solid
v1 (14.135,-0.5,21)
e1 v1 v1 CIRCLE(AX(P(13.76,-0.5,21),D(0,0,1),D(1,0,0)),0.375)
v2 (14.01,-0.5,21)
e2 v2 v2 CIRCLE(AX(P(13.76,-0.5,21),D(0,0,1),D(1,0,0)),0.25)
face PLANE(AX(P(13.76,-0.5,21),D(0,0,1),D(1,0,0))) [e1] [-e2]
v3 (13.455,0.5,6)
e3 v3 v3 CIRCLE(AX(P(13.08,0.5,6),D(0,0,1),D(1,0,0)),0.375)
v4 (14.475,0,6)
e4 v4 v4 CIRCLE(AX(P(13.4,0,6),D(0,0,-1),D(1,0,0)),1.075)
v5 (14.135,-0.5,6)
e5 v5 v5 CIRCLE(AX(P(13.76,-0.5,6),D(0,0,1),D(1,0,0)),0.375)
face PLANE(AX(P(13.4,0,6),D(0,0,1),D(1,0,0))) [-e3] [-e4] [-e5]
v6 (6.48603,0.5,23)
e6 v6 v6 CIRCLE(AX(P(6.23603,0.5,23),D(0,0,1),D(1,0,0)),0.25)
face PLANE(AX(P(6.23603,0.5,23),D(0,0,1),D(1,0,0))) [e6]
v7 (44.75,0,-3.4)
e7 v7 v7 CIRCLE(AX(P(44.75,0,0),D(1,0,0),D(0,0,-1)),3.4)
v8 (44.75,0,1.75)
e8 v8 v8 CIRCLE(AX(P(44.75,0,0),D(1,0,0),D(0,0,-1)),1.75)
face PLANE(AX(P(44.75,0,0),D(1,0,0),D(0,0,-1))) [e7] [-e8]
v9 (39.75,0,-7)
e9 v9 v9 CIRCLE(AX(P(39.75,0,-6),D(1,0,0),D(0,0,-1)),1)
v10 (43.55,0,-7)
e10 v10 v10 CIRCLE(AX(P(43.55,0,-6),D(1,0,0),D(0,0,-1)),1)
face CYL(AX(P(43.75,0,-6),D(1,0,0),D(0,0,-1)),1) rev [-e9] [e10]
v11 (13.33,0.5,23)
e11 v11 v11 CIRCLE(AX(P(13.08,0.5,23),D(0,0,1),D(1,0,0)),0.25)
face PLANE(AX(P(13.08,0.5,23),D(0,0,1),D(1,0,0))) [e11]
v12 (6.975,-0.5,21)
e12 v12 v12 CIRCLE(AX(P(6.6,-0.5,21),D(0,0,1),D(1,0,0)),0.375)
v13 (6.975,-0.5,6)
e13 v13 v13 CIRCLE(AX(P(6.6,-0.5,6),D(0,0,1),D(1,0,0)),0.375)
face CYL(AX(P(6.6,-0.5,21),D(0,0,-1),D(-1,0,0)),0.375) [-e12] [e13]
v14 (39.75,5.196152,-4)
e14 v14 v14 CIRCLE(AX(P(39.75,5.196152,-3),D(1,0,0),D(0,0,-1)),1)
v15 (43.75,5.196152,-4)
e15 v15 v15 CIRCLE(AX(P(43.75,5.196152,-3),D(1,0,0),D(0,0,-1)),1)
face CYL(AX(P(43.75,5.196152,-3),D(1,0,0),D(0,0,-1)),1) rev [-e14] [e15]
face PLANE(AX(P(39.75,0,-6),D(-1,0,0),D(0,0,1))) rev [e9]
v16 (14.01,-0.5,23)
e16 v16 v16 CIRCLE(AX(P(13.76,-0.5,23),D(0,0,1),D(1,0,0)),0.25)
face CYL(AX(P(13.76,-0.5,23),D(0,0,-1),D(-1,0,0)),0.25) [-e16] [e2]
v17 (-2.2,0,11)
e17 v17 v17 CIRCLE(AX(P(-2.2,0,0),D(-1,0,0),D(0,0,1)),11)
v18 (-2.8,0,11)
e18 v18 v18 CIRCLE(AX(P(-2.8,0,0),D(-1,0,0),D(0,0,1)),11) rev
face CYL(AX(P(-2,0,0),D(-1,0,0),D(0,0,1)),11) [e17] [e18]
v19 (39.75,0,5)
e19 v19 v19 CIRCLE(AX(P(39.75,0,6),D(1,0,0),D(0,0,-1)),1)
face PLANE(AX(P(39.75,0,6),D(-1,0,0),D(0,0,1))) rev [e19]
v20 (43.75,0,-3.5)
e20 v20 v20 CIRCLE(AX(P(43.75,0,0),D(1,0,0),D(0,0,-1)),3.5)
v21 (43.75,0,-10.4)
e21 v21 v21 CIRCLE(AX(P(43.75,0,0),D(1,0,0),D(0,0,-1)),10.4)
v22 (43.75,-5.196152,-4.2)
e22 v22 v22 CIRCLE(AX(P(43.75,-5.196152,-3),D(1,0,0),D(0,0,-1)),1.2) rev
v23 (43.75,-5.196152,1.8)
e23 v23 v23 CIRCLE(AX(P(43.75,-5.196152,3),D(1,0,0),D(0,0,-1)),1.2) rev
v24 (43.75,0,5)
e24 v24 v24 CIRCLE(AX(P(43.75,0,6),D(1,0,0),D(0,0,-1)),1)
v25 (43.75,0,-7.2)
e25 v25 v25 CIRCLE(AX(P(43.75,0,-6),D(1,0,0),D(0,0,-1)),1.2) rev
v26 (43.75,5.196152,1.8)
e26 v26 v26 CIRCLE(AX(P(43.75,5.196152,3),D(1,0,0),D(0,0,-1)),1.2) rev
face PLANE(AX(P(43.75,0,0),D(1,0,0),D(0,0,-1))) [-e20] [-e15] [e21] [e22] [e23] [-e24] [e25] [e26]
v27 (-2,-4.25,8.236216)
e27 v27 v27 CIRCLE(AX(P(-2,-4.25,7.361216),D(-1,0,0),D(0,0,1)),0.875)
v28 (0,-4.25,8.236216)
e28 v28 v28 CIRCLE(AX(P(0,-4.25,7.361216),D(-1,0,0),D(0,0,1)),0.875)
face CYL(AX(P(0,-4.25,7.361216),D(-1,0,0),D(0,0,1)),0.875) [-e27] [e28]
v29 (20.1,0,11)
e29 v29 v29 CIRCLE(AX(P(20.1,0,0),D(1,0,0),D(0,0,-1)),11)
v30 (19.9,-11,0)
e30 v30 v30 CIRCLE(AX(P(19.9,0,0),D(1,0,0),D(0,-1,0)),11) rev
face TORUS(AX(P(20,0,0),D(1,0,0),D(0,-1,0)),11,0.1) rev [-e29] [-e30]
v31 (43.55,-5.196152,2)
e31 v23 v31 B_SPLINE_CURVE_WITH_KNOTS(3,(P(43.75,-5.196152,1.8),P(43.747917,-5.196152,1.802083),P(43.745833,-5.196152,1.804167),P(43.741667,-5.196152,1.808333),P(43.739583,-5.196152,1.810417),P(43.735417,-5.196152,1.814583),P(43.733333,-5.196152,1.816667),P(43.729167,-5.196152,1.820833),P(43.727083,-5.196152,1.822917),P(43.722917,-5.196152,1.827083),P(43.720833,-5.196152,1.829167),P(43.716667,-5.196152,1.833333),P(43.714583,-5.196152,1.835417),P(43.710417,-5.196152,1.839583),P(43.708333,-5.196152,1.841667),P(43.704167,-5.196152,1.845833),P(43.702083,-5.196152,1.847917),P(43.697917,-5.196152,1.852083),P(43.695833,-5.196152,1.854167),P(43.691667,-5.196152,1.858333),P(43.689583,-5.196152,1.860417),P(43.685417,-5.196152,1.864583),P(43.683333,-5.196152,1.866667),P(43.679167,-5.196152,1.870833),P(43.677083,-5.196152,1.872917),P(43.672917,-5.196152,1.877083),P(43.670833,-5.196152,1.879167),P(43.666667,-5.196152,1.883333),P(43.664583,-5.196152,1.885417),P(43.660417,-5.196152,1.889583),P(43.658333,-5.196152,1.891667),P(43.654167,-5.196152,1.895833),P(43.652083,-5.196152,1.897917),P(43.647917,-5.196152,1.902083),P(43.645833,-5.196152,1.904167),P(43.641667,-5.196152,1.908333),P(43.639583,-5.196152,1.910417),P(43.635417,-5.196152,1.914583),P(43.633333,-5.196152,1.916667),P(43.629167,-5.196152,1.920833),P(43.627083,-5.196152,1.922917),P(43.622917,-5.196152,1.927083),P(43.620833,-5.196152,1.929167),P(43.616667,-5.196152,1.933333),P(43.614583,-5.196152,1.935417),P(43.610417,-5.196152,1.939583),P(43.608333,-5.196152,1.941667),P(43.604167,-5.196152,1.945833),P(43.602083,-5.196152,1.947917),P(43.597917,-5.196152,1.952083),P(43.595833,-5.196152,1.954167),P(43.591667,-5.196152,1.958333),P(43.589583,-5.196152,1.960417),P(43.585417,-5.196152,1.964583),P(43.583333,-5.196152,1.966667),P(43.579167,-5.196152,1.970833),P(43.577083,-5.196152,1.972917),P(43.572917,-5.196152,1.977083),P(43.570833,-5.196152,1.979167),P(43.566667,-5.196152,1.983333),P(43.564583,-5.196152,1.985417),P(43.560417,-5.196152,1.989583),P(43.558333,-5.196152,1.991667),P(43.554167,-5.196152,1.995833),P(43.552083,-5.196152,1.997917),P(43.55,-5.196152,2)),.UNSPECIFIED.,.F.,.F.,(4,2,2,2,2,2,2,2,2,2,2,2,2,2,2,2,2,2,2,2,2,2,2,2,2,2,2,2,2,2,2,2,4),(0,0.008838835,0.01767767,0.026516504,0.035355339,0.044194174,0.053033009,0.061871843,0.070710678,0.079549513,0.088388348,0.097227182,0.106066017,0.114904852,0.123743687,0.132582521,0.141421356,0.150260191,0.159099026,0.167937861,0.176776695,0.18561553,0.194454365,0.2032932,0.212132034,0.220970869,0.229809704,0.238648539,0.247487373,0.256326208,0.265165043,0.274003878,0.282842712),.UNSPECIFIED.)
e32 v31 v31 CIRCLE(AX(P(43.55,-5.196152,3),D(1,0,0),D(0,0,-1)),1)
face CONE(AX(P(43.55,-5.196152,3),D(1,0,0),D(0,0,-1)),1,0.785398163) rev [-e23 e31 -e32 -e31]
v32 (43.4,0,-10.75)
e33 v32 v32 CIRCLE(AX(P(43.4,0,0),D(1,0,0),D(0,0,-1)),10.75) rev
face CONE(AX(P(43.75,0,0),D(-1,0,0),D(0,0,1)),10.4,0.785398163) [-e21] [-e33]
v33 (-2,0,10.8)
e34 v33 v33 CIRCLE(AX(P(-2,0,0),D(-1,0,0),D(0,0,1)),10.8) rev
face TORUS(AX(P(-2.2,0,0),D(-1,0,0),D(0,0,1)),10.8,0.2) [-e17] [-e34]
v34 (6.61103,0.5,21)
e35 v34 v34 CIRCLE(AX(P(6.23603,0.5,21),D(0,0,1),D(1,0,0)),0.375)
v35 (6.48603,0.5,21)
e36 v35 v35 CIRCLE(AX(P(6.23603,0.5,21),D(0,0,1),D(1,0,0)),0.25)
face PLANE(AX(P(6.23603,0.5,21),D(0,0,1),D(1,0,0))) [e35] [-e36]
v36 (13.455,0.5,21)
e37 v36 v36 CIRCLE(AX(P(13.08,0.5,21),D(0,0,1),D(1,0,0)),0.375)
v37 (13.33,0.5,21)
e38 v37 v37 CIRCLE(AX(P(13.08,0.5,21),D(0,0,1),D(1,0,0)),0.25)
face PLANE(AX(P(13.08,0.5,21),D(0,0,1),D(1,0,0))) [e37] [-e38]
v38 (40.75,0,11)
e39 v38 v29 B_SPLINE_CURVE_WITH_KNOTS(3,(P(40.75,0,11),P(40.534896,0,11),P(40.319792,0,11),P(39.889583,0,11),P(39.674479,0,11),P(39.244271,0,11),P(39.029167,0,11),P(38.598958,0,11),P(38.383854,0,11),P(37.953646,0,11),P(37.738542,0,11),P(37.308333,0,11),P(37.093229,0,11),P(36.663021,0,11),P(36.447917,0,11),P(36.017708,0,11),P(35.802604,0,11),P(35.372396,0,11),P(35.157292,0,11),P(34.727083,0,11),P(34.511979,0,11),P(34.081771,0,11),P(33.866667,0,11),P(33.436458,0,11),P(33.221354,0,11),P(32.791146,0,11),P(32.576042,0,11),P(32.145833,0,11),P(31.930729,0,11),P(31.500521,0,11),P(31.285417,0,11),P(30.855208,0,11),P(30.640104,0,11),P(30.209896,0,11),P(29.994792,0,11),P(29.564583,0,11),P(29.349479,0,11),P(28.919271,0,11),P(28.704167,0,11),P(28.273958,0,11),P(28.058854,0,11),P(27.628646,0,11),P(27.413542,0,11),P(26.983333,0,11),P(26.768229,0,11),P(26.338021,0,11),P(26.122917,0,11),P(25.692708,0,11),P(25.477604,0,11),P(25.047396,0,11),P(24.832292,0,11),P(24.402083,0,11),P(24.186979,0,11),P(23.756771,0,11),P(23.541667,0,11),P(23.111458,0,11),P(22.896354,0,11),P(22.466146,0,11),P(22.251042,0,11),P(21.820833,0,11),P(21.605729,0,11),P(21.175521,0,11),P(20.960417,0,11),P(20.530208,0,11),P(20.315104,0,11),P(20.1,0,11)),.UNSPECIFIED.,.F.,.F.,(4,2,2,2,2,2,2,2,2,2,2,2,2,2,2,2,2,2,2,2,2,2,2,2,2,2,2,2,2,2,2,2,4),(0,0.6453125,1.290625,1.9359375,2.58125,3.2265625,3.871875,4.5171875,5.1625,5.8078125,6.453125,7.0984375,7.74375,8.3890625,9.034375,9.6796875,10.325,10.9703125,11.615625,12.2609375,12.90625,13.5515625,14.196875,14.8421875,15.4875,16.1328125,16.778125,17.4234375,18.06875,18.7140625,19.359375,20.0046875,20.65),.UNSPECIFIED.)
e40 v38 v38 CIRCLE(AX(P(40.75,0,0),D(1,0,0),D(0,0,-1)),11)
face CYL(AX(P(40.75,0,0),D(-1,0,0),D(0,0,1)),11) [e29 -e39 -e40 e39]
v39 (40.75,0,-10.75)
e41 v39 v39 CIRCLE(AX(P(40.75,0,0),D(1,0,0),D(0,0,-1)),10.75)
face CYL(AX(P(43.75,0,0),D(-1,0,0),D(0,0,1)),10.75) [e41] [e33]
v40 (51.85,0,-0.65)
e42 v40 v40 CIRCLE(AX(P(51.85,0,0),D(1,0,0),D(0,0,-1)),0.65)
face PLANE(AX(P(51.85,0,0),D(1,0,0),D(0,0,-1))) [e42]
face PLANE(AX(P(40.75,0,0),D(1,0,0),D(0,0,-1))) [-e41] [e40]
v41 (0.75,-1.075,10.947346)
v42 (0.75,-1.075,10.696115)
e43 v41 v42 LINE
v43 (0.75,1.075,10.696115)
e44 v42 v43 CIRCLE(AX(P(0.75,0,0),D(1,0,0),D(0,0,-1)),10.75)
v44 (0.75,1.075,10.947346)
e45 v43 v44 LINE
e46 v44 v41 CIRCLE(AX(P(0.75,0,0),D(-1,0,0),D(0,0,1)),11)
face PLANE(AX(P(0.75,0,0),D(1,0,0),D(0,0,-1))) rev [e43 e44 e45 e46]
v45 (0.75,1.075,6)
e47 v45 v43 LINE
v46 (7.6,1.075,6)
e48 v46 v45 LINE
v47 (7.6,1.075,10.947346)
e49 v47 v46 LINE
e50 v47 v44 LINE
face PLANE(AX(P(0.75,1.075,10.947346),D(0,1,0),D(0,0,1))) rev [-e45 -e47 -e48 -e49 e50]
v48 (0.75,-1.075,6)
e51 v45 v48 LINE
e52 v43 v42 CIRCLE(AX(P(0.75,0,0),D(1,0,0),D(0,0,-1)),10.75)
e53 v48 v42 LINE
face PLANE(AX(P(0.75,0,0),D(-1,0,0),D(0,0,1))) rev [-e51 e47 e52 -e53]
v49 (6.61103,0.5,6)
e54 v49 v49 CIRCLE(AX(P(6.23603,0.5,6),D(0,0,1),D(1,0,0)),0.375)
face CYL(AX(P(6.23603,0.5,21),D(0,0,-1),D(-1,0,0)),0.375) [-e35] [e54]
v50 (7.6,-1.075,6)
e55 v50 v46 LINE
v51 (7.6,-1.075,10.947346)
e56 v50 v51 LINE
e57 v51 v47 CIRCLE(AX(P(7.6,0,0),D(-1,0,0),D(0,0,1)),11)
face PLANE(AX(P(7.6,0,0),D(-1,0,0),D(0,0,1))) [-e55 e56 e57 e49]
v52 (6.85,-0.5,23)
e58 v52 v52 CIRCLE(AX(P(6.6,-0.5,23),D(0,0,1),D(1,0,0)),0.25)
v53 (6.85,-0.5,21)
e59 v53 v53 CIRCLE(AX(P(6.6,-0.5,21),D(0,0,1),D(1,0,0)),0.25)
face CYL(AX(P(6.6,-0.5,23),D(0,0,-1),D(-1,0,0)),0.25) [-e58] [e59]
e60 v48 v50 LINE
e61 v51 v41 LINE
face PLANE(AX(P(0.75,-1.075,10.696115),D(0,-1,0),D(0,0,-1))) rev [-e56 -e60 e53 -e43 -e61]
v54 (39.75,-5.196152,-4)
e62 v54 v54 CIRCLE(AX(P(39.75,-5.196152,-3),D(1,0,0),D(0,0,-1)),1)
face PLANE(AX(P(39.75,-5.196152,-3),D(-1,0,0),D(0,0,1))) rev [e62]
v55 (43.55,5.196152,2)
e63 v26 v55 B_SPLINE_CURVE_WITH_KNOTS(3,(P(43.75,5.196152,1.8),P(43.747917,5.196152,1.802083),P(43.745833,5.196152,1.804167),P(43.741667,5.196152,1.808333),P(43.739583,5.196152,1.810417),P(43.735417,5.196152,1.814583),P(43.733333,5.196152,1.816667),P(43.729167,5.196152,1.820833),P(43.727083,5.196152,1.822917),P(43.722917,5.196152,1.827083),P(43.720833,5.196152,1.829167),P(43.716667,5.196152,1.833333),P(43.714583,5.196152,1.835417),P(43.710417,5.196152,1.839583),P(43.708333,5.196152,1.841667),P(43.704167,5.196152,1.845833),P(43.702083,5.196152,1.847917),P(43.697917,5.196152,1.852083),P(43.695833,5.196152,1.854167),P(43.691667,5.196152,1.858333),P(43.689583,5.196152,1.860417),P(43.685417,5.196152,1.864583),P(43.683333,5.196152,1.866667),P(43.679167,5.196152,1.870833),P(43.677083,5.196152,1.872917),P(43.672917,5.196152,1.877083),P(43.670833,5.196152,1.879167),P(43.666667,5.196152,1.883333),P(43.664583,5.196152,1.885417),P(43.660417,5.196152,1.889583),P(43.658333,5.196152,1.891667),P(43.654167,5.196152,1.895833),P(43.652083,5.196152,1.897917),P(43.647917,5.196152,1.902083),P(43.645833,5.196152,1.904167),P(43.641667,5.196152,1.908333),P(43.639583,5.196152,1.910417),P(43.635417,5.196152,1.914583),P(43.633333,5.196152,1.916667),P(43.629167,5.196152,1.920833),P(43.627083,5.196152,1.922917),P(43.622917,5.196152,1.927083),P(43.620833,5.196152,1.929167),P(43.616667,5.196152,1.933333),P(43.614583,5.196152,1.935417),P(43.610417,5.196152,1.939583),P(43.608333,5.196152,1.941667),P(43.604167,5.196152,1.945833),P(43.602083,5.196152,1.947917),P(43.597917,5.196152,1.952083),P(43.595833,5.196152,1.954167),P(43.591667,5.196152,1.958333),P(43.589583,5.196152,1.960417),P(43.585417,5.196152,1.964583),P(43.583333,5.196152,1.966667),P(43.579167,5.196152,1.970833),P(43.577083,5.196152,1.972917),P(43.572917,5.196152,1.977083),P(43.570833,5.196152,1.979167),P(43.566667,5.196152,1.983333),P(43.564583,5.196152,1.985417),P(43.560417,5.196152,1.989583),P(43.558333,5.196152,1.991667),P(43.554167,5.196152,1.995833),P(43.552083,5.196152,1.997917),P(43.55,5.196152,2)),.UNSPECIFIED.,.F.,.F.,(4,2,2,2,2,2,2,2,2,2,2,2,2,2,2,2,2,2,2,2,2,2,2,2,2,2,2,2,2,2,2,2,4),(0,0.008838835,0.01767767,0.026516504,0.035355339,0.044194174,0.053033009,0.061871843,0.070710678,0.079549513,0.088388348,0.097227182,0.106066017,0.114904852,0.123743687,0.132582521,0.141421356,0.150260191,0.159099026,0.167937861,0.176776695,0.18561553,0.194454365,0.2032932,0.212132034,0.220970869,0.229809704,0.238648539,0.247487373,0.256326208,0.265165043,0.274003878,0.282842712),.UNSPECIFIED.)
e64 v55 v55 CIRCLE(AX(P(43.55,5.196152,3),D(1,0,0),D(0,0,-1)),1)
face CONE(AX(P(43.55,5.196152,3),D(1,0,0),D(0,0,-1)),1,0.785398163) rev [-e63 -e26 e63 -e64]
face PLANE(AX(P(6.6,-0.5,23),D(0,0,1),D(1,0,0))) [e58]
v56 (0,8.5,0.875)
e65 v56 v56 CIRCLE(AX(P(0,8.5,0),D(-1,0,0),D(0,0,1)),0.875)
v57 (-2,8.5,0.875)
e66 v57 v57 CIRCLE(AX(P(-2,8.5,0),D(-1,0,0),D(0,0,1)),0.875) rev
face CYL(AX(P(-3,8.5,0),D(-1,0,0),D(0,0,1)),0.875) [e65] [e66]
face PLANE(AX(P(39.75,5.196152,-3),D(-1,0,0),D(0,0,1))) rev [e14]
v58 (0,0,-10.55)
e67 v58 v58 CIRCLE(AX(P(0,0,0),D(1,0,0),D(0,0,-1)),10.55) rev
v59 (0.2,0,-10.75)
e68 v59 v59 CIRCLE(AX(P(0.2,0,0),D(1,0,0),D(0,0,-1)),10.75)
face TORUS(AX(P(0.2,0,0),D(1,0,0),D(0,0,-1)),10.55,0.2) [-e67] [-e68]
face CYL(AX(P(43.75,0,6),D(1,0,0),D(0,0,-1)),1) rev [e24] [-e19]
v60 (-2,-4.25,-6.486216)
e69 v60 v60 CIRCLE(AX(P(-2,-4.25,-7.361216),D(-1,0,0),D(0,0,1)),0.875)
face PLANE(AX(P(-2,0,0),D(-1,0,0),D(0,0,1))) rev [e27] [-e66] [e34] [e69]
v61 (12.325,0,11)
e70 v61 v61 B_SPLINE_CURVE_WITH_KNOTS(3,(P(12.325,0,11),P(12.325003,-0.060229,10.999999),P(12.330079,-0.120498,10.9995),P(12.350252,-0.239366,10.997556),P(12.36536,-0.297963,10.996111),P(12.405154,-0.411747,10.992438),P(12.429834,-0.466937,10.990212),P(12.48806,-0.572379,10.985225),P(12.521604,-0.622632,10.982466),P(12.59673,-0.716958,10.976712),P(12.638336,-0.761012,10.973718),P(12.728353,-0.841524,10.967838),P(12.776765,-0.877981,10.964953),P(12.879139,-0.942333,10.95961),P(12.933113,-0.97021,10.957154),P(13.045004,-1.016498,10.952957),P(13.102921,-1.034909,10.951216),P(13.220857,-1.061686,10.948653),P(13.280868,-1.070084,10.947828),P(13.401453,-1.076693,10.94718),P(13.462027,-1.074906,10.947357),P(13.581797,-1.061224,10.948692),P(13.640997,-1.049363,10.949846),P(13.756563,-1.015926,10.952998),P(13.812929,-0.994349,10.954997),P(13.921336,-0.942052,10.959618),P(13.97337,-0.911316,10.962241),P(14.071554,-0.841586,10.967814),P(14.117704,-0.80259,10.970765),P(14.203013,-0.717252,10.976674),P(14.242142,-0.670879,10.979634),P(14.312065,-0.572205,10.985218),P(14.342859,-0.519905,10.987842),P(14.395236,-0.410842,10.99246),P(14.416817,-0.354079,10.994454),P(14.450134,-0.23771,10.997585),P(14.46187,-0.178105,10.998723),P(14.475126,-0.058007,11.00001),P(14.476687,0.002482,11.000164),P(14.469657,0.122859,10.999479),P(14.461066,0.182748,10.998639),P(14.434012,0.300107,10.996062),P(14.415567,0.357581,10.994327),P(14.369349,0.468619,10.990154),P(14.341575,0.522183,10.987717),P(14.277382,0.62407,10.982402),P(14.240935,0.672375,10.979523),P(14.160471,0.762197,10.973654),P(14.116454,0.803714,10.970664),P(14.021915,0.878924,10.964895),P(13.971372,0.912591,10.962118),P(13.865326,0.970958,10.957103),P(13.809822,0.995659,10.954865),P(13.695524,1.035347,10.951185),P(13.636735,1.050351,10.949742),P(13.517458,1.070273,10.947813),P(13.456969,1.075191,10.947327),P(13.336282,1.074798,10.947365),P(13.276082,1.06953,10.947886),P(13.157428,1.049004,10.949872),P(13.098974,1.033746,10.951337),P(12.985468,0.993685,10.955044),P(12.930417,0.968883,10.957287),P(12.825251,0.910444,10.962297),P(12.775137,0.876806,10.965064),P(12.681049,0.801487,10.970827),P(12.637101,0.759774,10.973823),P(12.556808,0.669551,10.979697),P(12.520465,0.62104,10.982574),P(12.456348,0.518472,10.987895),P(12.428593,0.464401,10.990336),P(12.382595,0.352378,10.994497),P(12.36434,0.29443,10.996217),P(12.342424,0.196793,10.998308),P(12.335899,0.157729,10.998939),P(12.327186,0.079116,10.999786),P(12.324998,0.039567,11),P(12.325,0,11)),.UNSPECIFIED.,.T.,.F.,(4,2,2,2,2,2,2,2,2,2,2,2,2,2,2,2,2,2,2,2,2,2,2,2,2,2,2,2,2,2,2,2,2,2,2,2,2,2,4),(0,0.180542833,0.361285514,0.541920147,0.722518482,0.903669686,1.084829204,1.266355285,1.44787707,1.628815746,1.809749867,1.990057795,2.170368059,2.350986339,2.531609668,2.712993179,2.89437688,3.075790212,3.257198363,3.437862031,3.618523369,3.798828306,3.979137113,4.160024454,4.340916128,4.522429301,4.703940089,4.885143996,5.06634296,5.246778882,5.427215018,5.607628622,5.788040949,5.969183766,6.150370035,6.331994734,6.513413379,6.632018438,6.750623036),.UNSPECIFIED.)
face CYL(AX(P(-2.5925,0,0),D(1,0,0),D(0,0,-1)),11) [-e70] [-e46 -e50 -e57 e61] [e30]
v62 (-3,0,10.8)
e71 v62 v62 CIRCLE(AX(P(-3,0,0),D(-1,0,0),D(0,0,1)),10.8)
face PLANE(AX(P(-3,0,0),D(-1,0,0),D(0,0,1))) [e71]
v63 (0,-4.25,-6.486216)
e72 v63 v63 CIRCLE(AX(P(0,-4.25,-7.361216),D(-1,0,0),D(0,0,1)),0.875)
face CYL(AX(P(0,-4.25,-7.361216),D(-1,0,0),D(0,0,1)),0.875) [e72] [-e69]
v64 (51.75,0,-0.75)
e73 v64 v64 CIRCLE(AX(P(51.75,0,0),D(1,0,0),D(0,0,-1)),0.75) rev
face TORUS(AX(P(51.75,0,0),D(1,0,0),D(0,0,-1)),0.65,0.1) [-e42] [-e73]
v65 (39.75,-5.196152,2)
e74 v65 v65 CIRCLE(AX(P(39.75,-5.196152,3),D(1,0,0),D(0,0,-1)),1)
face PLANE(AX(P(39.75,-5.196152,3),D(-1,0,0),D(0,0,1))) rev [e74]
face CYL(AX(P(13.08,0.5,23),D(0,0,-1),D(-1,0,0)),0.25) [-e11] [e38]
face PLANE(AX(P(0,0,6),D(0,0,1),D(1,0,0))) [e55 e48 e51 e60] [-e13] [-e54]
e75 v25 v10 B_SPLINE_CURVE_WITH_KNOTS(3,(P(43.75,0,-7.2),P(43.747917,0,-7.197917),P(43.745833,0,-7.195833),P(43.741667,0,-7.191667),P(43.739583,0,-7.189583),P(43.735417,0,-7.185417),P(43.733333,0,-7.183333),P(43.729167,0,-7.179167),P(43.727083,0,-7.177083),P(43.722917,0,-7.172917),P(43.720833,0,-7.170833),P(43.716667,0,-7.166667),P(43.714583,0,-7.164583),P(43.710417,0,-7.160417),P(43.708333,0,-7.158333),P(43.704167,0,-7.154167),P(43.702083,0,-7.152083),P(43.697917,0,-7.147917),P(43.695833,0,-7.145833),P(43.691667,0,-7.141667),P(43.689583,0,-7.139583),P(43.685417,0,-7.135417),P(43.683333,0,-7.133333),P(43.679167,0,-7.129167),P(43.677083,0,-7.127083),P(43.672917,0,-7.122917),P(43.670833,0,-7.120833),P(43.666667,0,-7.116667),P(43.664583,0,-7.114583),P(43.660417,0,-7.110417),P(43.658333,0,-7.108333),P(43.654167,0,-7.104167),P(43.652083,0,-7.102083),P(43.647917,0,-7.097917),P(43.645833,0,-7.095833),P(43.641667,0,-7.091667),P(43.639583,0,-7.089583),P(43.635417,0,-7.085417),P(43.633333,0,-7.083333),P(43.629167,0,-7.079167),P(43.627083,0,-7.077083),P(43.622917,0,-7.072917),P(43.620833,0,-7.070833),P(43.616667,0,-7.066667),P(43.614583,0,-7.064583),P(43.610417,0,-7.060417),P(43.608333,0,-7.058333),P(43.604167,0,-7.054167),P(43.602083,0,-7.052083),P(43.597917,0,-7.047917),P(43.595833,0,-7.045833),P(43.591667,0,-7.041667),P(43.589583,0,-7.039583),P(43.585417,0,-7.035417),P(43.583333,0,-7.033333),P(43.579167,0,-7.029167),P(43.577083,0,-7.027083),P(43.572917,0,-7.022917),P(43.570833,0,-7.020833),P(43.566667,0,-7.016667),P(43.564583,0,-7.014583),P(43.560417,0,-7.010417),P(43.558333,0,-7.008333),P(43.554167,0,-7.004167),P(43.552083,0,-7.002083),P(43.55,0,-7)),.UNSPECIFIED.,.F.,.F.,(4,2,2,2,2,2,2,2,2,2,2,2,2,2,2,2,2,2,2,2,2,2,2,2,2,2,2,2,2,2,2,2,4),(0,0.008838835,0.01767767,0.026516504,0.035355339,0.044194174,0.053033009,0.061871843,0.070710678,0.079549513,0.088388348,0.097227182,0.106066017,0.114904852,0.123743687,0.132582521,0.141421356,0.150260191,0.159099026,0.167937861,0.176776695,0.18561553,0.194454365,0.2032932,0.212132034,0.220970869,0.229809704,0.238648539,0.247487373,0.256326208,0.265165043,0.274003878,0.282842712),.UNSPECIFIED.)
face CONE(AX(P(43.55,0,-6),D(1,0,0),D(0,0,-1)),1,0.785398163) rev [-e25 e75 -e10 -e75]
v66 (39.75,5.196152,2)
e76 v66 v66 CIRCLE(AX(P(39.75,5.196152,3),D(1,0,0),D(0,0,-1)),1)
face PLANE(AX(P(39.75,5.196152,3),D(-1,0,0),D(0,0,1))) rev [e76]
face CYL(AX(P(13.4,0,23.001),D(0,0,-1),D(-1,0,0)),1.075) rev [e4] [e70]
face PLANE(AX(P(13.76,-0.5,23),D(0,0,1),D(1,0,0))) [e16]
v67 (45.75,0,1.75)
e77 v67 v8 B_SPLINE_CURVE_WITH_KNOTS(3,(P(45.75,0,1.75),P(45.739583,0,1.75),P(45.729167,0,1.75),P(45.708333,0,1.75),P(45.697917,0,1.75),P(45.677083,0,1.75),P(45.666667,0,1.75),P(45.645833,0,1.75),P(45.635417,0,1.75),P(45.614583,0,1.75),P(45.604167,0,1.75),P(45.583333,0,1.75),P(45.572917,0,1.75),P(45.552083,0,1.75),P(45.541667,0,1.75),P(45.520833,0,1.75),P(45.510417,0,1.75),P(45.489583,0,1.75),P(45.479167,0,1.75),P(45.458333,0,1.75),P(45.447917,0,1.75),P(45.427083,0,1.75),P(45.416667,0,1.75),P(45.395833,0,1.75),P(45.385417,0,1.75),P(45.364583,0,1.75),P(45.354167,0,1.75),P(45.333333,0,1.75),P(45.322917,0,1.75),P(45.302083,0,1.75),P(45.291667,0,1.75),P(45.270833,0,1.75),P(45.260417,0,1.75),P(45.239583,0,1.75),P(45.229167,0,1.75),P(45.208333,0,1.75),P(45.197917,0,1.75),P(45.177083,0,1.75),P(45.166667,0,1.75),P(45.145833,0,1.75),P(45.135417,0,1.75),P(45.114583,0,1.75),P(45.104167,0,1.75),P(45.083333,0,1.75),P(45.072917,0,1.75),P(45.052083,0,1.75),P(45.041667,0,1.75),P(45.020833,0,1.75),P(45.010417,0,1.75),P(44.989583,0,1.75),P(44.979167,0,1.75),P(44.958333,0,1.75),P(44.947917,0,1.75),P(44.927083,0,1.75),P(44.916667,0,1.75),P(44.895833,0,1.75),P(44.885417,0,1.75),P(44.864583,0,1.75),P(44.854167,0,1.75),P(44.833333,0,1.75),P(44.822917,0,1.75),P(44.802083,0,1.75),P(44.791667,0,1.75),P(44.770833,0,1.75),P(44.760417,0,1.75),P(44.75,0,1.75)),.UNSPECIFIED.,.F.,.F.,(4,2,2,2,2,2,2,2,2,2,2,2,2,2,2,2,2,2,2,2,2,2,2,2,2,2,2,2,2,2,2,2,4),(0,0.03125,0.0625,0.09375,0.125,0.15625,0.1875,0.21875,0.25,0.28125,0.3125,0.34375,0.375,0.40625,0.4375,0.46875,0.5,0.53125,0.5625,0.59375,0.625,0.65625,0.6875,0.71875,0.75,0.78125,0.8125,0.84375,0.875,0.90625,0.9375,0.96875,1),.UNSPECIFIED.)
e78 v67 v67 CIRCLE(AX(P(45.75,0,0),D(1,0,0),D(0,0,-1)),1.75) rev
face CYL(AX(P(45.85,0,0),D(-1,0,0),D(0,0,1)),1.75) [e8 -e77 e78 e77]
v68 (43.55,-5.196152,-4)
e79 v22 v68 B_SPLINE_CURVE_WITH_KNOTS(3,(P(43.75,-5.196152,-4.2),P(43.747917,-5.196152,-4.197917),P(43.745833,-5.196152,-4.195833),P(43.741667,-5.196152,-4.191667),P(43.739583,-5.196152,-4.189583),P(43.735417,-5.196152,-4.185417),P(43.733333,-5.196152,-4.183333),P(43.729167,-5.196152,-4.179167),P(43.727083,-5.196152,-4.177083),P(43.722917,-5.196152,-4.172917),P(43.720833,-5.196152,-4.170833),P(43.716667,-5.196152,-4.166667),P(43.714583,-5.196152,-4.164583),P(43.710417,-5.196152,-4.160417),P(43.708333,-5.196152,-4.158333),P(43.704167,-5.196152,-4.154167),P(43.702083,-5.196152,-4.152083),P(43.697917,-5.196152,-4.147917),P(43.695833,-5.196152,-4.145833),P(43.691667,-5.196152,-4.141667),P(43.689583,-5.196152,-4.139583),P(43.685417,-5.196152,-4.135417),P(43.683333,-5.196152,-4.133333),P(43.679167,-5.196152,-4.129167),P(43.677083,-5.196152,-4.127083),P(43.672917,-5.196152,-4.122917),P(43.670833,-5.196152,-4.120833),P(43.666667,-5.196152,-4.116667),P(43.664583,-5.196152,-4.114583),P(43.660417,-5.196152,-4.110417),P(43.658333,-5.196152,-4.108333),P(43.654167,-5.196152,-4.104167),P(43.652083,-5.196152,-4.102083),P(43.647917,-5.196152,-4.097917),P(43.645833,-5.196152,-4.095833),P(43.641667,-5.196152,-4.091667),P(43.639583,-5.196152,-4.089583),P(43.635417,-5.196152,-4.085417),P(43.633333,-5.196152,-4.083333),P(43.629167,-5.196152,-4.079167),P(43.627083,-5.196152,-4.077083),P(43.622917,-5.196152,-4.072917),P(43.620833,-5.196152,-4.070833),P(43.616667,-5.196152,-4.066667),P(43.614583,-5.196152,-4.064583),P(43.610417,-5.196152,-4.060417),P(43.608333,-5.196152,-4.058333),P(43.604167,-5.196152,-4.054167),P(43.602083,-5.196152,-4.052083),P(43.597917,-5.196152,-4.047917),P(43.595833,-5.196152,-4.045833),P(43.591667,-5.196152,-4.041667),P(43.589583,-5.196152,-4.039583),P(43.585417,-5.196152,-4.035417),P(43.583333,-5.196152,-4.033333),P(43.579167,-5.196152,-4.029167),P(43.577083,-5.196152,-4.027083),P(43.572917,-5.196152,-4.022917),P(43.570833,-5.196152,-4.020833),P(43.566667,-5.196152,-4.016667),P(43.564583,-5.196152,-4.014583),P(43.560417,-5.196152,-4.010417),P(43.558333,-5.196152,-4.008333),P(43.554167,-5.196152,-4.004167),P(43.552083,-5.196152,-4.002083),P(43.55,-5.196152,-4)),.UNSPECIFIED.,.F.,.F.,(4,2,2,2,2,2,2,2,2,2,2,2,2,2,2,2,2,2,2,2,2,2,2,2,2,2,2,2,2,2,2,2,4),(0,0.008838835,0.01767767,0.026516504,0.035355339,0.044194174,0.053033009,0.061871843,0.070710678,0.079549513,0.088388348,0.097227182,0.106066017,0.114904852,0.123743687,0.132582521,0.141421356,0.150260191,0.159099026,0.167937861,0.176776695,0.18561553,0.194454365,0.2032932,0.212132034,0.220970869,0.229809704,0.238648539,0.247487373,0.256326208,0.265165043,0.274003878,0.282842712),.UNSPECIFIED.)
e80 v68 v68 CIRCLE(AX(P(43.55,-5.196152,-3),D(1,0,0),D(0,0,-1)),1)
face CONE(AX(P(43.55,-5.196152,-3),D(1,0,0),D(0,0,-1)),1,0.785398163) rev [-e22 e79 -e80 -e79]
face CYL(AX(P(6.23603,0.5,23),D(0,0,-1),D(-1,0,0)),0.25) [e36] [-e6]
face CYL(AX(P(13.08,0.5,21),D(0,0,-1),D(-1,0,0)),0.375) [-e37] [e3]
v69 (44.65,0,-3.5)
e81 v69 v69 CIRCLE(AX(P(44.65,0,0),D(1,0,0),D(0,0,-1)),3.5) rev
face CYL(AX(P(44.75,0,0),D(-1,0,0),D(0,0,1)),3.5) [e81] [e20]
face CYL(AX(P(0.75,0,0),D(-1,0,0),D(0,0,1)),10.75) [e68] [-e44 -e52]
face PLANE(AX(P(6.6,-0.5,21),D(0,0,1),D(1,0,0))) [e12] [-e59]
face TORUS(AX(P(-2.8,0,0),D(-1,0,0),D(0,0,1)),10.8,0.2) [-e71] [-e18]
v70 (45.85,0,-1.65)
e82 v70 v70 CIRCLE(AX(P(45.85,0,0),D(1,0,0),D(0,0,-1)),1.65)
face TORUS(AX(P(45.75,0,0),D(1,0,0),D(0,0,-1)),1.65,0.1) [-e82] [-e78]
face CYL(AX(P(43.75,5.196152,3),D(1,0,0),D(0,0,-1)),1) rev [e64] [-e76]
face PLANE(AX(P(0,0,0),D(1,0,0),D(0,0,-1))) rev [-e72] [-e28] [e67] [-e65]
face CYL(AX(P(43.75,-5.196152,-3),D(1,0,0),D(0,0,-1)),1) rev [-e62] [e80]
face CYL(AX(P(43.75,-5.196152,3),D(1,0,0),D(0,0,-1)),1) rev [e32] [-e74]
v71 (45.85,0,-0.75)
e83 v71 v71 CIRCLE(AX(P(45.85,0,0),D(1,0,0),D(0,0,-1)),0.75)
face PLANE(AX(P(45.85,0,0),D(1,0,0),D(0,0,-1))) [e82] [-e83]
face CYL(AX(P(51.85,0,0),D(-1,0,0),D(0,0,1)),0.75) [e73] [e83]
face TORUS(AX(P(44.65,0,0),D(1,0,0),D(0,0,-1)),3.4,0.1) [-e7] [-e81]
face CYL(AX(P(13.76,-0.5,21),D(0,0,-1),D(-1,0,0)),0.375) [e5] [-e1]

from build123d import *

# Parameters (mm, degrees)
CUT_EXTRUDE1_OUTLINE_W       = 11
CUT_EXTRUDE1_OUTLINE_H       = 1
CUT_EXTRUDE1_2_DEPTH         = 0.75
CUT_EXTRUDE1_START           = -2
CUT_EXTRUDE1_3_OUTLINE_R     = 0.875
CUT_EXTRUDE1_3_DEPTH         = 2
CUT_EXTRUDE2_START           = -6.85
CUT_EXTRUDE2_DEPTH           = 6.85
CUT_EXTRUDE3_START           = -0.75
CUT_EXTRUDE3_DEPTH           = 0.75
SKETCH4_W                    = 6.85
SKETCH4_H                    = 2.15
CUT_EXTRUDE4_DEPTH           = 4.696114949
BOSS_EXTRUDE1_START          = 20.65
SKETCH5_R                    = 11
BOSS_EXTRUDE1_DEPTH          = 20.65
SKETCH6_R                    = 10.75
BOSS_EXTRUDE2_DEPTH          = 3
SKETCH7_R                    = 3.5
BOSS_EXTRUDE3_DEPTH          = 1
SKETCH8_R                    = 1.75
BOSS_EXTRUDE4_DEPTH          = 1.1
SKETCH9_R                    = 0.75
BOSS_EXTRUDE5_DEPTH          = 6
SKETCH10_R                   = 0.375
BOSS_EXTRUDE6_DEPTH          = 15
SKETCH11_R                   = 0.25
BOSS_EXTRUDE7_DEPTH          = 2
SKETCH12_R                   = 0.375
BOSS_EXTRUDE8_DEPTH          = 15
SKETCH13_R                   = 0.25
BOSS_EXTRUDE9_DEPTH          = 2
CUT_EXTRUDE5_REACH           = 57.663
CUT_EXTRUDE5_END_RADIUS      = 11
SKETCH14_R                   = 1.075
SKETCH15_R                   = 0.375
BOSS_EXTRUDE10_DEPTH         = 15
SKETCH16_R                   = 0.25
BOSS_EXTRUDE11_DEPTH         = 2
SKETCH17_R                   = 0.375
BOSS_EXTRUDE12_DEPTH         = 15
SKETCH18_R                   = 0.25
BOSS_EXTRUDE13_DEPTH         = 2
SKETCH19_W                   = 2
SKETCH19_H                   = 0.875
SKETCH20_W                   = 2
SKETCH20_H                   = 0.875
F_2_0_2_DIAMETER_HOLE1_D     = 2
F_2_0_2_DIAMETER_HOLE1_DEPTH = 4
FILLET1_R                    = 0.1
CHAMFER1_SIZE                = 0.2
CHAMFER2_SIZE                = 0.35
FILLET2_R                    = 0.2


with BuildPart() as part:
    # Cut-Extrude1: read off the stored shape, not the designer's step
    # Cut-Extrude1 outline → Cut-Extrude1 (revolve)
    with BuildSketch(Plane.YX):
        with Locations((5.5, -2.5)):
            Rectangle(CUT_EXTRUDE1_OUTLINE_W, CUT_EXTRUDE1_OUTLINE_H)
        with BuildLine():
            Line((11, 0), (11, 19.9))
            ThreePointArc((11, 19.9), (10.9, 20), (11, 20.1))
            Line((11, 20.1), (0, 20.1))
            Line((0, 20.1), (0, 0))
            Line((0, 0), (11, 0))
        make_face()
    revolve(axis=Axis((0, 0, 0), (1, 0, 0)))

    # Cut-Extrude1 2 outline → Cut-Extrude1 2 (cut)
    with BuildSketch(Plane.YZ):
        with BuildLine():
            Line((-1.075, 10.947345569), (-1.075, 10.696114949))
            ThreePointArc((-1.075, 10.696114949), (0, 10.75), (1.075, 10.696114949))
            Line((1.075, 10.696114949), (1.075, 10.947345569))
            ThreePointArc((1.075, 10.947345569), (0, 11), (-1.075, 10.947345569))
        make_face()
    extrude(amount=CUT_EXTRUDE1_2_DEPTH, mode=Mode.SUBTRACT)

    # Cut-Extrude1 3 outline → Cut-Extrude1 3 (add)
    with BuildSketch(Plane.YZ.offset(CUT_EXTRUDE1_START)):
        with Locations((8.5, 0)):
            Circle(CUT_EXTRUDE1_3_OUTLINE_R)
    extrude(amount=CUT_EXTRUDE1_3_DEPTH)

    # Sketch2 → Cut-Extrude2 (cut)
    with BuildSketch(Plane.ZY.offset(-0.75).offset(CUT_EXTRUDE2_START)):
        with BuildLine():
            Line((10.947345569, 1.075), (10.696114949, 1.075))
            Line((10.696114949, 1.075), (10.696114949, -1.075))
            Line((10.696114949, -1.075), (10.947345569, -1.075))
            ThreePointArc((10.947345569, -1.075), (11, 0), (10.947345569, 1.075))
        make_face()
    extrude(amount=CUT_EXTRUDE2_DEPTH, mode=Mode.SUBTRACT)

    # Sketch3 → Cut-Extrude3 (cut)
    with BuildSketch(Plane.ZY.offset(CUT_EXTRUDE3_START)):
        with BuildLine():
            Line((10.696114949, 1.075), (10.947345569, 1.075))
            ThreePointArc((10.947345569, 1.075), (-11, 0), (10.947345569, -1.075))
            Line((10.947345569, -1.075), (10.696114949, -1.075))
            ThreePointArc((10.696114949, -1.075), (-10.75, 0), (10.696114949, 1.075))
        make_face()
    extrude(amount=CUT_EXTRUDE3_DEPTH, mode=Mode.SUBTRACT)

    # Sketch4 → Cut-Extrude4 (cut)
    with BuildSketch(Plane.XY.offset(10.696114949)):
        with Locations((4.175, 0)):
            Rectangle(SKETCH4_W, SKETCH4_H)
    extrude(amount=-CUT_EXTRUDE4_DEPTH, mode=Mode.SUBTRACT)

    # Sketch5 → Boss-Extrude1 (add)
    with BuildSketch(Plane(origin=(20.1, 0, 0), x_dir=(0, 0, -1), z_dir=(1, 0, 0)).offset(BOSS_EXTRUDE1_START)):
        with Locations(Location((0, 0, 0), (0, 0, 180))):
            Circle(SKETCH5_R)
    extrude(amount=-BOSS_EXTRUDE1_DEPTH)

    # Sketch6 → Boss-Extrude2 (add)
    with BuildSketch(Plane(origin=(40.75, 0, 0), x_dir=(0, 0, -1), z_dir=(1, 0, 0))):
        with Locations(Location((0, 0, 0), (0, 0, 174.260829523))):
            Circle(SKETCH6_R)
    extrude(amount=BOSS_EXTRUDE2_DEPTH)

    # Sketch7 → Boss-Extrude3 (add)
    with BuildSketch(Plane(origin=(43.75, 0, 0), x_dir=(0, 0, -1), z_dir=(1, 0, 0))):
        Circle(SKETCH7_R)
    extrude(amount=BOSS_EXTRUDE3_DEPTH)

    # Sketch8 → Boss-Extrude4 (add)
    with BuildSketch(Plane(origin=(44.75, 0, 0), x_dir=(0, 0, -1), z_dir=(1, 0, 0))):
        with Locations(Location((0, 0, 0), (0, 0, 180))):
            Circle(SKETCH8_R)
    extrude(amount=BOSS_EXTRUDE4_DEPTH)

    # Sketch9 → Boss-Extrude5 (add)
    with BuildSketch(Plane(origin=(45.85, 0, 0), x_dir=(0, 0, -1), z_dir=(1, 0, 0))):
        Circle(SKETCH9_R)
    extrude(amount=BOSS_EXTRUDE5_DEPTH)

    # Sketch10 → Boss-Extrude6 (add)
    with BuildSketch(Plane.XY.offset(6)):
        with Locations((6.236029766, 0.5)):
            Circle(SKETCH10_R)
    extrude(amount=BOSS_EXTRUDE6_DEPTH)

    # Sketch11 → Boss-Extrude7 (add)
    with BuildSketch(Plane.XY.offset(21)):
        with Locations((6.236029766, 0.5)):
            Circle(SKETCH11_R)
    extrude(amount=BOSS_EXTRUDE7_DEPTH)

    # Sketch12 → Boss-Extrude8 (add)
    with BuildSketch(Plane.XY.offset(6)):
        with Locations((6.6, -0.5)):
            Circle(SKETCH12_R)
    extrude(amount=BOSS_EXTRUDE8_DEPTH)

    # Sketch13 → Boss-Extrude9 (add)
    with BuildSketch(Plane.XY.offset(21)):
        with Locations((6.6, -0.5)):
            Circle(SKETCH13_R)
    extrude(amount=BOSS_EXTRUDE9_DEPTH)

    # Cut-Extrude5: up to this cylinder (the profile starts inside it)
    cut_extrude5_end = Plane(origin=(13.4, 0, 0), z_dir=(1, 0, 0)) * Cylinder(CUT_EXTRUDE5_END_RADIUS, 138.326, mode=Mode.PRIVATE)
    # Sketch14 → Cut-Extrude5 (cut, up to the surface)
    with BuildSketch(Plane(origin=(0, 0, 6), x_dir=(-1, 0, 0), z_dir=(0, 0, -1)), mode=Mode.PRIVATE) as cut_extrude5_sk1:
        with Locations((-13.4, 0)):
            Circle(SKETCH14_R)
    cut_extrude5_tool1 = extrude(cut_extrude5_sk1.sketch, amount=-CUT_EXTRUDE5_REACH, mode=Mode.PRIVATE) & cut_extrude5_end
    add(cut_extrude5_tool1.solids().sort_by_distance((13.4, 0, 6))[0], mode=Mode.SUBTRACT)

    # Sketch15 → Boss-Extrude10 (add)
    with BuildSketch(Plane.XY.offset(6)):
        with Locations((13.08, 0.5)):
            Circle(SKETCH15_R)
    extrude(amount=BOSS_EXTRUDE10_DEPTH)

    # Sketch16 → Boss-Extrude11 (add)
    with BuildSketch(Plane.XY.offset(21)):
        with Locations((13.08, 0.5)):
            Circle(SKETCH16_R)
    extrude(amount=BOSS_EXTRUDE11_DEPTH)

    # Sketch17 → Boss-Extrude12 (add)
    with BuildSketch(Plane.XY.offset(6)):
        with Locations((13.76, -0.5)):
            Circle(SKETCH17_R)
    extrude(amount=BOSS_EXTRUDE12_DEPTH)

    # Sketch18 → Boss-Extrude13 (add)
    with BuildSketch(Plane.XY.offset(21)):
        with Locations((13.76, -0.5)):
            Circle(SKETCH18_R)
    extrude(amount=BOSS_EXTRUDE13_DEPTH)

    # Sketch19 → Revolve1 (revolve)
    with BuildSketch(Plane(origin=(0, 0, -7.361215932), x_dir=(-1, 0, 0), z_dir=(0, 0, -1)), mode=Mode.PRIVATE) as revolve1_sk:
        with Locations((1, -3.8125)):
            Rectangle(SKETCH19_W, SKETCH19_H)
    revolve(revolve1_sk.sketch.rotate(Axis((0, -4.25, -7.361215932), (-1, 0, 0)), 270), axis=Axis((0, -4.25, -7.361215932), (-1, 0, 0)))

    # Sketch20 → Revolve2 (revolve)
    with BuildSketch(Plane(origin=(0, 0, 7.361215932), x_dir=(-1, 0, 0), z_dir=(0, 0, -1)), mode=Mode.PRIVATE) as revolve2_sk:
        with Locations((1, -3.8125)):
            Rectangle(SKETCH20_W, SKETCH20_H)
    revolve(revolve2_sk.sketch.rotate(Axis((0, -4.25, 7.361215932), (-1, 0, 0)), 270), axis=Axis((0, -4.25, 7.361215932), (-1, 0, 0)))

    # Ø2.0 (2) Diameter Hole1
    with Locations(Plane(origin=(43.75, 0, 0), x_dir=(0, 0, -1), z_dir=(1, 0, 0))):
        with Locations((-3, 5.196152423), (6, 0), (3, -5.196152423), (-3, -5.196152423), (-6, 0), (3, 5.196152423)):
            Hole(F_2_0_2_DIAMETER_HOLE1_D / 2, depth=F_2_0_2_DIAMETER_HOLE1_DEPTH)

    # Fillet1
    fillet1_edges = [part.edges().sort_by_distance(p)[0] for p in [
        (44.75, 0, 3.5),
        (45.85, 0, -1.75),
        (51.85, 0, 0.75),
    ]]
    fillet(fillet1_edges, radius=FILLET1_R)

    # Chamfer1
    chamfer1_edges = [part.edges().sort_by_distance(p)[0] for p in [
        (43.75, -5.196152423, 2),
        (43.75, -5.196152423, -4),
        (43.75, 0, -7),
        (43.75, 5.196152423, 2),
    ]]
    chamfer(chamfer1_edges, length=CHAMFER1_SIZE)

    # Chamfer2
    chamfer2_edges = [part.edges().sort_by_distance(p)[0] for p in [
        (43.75, -1.075, -10.696114949),
    ]]
    chamfer(chamfer2_edges, length=CHAMFER2_SIZE)

    # Fillet2
    fillet2_edges = [part.edges().sort_by_distance(p)[0] for p in [
        (-2, -11, 0),
        (-3, -11, 0),
        (0, 0, -10.75),
    ]]
    fillet(fillet2_edges, radius=FILLET2_R)


solid = part.part
